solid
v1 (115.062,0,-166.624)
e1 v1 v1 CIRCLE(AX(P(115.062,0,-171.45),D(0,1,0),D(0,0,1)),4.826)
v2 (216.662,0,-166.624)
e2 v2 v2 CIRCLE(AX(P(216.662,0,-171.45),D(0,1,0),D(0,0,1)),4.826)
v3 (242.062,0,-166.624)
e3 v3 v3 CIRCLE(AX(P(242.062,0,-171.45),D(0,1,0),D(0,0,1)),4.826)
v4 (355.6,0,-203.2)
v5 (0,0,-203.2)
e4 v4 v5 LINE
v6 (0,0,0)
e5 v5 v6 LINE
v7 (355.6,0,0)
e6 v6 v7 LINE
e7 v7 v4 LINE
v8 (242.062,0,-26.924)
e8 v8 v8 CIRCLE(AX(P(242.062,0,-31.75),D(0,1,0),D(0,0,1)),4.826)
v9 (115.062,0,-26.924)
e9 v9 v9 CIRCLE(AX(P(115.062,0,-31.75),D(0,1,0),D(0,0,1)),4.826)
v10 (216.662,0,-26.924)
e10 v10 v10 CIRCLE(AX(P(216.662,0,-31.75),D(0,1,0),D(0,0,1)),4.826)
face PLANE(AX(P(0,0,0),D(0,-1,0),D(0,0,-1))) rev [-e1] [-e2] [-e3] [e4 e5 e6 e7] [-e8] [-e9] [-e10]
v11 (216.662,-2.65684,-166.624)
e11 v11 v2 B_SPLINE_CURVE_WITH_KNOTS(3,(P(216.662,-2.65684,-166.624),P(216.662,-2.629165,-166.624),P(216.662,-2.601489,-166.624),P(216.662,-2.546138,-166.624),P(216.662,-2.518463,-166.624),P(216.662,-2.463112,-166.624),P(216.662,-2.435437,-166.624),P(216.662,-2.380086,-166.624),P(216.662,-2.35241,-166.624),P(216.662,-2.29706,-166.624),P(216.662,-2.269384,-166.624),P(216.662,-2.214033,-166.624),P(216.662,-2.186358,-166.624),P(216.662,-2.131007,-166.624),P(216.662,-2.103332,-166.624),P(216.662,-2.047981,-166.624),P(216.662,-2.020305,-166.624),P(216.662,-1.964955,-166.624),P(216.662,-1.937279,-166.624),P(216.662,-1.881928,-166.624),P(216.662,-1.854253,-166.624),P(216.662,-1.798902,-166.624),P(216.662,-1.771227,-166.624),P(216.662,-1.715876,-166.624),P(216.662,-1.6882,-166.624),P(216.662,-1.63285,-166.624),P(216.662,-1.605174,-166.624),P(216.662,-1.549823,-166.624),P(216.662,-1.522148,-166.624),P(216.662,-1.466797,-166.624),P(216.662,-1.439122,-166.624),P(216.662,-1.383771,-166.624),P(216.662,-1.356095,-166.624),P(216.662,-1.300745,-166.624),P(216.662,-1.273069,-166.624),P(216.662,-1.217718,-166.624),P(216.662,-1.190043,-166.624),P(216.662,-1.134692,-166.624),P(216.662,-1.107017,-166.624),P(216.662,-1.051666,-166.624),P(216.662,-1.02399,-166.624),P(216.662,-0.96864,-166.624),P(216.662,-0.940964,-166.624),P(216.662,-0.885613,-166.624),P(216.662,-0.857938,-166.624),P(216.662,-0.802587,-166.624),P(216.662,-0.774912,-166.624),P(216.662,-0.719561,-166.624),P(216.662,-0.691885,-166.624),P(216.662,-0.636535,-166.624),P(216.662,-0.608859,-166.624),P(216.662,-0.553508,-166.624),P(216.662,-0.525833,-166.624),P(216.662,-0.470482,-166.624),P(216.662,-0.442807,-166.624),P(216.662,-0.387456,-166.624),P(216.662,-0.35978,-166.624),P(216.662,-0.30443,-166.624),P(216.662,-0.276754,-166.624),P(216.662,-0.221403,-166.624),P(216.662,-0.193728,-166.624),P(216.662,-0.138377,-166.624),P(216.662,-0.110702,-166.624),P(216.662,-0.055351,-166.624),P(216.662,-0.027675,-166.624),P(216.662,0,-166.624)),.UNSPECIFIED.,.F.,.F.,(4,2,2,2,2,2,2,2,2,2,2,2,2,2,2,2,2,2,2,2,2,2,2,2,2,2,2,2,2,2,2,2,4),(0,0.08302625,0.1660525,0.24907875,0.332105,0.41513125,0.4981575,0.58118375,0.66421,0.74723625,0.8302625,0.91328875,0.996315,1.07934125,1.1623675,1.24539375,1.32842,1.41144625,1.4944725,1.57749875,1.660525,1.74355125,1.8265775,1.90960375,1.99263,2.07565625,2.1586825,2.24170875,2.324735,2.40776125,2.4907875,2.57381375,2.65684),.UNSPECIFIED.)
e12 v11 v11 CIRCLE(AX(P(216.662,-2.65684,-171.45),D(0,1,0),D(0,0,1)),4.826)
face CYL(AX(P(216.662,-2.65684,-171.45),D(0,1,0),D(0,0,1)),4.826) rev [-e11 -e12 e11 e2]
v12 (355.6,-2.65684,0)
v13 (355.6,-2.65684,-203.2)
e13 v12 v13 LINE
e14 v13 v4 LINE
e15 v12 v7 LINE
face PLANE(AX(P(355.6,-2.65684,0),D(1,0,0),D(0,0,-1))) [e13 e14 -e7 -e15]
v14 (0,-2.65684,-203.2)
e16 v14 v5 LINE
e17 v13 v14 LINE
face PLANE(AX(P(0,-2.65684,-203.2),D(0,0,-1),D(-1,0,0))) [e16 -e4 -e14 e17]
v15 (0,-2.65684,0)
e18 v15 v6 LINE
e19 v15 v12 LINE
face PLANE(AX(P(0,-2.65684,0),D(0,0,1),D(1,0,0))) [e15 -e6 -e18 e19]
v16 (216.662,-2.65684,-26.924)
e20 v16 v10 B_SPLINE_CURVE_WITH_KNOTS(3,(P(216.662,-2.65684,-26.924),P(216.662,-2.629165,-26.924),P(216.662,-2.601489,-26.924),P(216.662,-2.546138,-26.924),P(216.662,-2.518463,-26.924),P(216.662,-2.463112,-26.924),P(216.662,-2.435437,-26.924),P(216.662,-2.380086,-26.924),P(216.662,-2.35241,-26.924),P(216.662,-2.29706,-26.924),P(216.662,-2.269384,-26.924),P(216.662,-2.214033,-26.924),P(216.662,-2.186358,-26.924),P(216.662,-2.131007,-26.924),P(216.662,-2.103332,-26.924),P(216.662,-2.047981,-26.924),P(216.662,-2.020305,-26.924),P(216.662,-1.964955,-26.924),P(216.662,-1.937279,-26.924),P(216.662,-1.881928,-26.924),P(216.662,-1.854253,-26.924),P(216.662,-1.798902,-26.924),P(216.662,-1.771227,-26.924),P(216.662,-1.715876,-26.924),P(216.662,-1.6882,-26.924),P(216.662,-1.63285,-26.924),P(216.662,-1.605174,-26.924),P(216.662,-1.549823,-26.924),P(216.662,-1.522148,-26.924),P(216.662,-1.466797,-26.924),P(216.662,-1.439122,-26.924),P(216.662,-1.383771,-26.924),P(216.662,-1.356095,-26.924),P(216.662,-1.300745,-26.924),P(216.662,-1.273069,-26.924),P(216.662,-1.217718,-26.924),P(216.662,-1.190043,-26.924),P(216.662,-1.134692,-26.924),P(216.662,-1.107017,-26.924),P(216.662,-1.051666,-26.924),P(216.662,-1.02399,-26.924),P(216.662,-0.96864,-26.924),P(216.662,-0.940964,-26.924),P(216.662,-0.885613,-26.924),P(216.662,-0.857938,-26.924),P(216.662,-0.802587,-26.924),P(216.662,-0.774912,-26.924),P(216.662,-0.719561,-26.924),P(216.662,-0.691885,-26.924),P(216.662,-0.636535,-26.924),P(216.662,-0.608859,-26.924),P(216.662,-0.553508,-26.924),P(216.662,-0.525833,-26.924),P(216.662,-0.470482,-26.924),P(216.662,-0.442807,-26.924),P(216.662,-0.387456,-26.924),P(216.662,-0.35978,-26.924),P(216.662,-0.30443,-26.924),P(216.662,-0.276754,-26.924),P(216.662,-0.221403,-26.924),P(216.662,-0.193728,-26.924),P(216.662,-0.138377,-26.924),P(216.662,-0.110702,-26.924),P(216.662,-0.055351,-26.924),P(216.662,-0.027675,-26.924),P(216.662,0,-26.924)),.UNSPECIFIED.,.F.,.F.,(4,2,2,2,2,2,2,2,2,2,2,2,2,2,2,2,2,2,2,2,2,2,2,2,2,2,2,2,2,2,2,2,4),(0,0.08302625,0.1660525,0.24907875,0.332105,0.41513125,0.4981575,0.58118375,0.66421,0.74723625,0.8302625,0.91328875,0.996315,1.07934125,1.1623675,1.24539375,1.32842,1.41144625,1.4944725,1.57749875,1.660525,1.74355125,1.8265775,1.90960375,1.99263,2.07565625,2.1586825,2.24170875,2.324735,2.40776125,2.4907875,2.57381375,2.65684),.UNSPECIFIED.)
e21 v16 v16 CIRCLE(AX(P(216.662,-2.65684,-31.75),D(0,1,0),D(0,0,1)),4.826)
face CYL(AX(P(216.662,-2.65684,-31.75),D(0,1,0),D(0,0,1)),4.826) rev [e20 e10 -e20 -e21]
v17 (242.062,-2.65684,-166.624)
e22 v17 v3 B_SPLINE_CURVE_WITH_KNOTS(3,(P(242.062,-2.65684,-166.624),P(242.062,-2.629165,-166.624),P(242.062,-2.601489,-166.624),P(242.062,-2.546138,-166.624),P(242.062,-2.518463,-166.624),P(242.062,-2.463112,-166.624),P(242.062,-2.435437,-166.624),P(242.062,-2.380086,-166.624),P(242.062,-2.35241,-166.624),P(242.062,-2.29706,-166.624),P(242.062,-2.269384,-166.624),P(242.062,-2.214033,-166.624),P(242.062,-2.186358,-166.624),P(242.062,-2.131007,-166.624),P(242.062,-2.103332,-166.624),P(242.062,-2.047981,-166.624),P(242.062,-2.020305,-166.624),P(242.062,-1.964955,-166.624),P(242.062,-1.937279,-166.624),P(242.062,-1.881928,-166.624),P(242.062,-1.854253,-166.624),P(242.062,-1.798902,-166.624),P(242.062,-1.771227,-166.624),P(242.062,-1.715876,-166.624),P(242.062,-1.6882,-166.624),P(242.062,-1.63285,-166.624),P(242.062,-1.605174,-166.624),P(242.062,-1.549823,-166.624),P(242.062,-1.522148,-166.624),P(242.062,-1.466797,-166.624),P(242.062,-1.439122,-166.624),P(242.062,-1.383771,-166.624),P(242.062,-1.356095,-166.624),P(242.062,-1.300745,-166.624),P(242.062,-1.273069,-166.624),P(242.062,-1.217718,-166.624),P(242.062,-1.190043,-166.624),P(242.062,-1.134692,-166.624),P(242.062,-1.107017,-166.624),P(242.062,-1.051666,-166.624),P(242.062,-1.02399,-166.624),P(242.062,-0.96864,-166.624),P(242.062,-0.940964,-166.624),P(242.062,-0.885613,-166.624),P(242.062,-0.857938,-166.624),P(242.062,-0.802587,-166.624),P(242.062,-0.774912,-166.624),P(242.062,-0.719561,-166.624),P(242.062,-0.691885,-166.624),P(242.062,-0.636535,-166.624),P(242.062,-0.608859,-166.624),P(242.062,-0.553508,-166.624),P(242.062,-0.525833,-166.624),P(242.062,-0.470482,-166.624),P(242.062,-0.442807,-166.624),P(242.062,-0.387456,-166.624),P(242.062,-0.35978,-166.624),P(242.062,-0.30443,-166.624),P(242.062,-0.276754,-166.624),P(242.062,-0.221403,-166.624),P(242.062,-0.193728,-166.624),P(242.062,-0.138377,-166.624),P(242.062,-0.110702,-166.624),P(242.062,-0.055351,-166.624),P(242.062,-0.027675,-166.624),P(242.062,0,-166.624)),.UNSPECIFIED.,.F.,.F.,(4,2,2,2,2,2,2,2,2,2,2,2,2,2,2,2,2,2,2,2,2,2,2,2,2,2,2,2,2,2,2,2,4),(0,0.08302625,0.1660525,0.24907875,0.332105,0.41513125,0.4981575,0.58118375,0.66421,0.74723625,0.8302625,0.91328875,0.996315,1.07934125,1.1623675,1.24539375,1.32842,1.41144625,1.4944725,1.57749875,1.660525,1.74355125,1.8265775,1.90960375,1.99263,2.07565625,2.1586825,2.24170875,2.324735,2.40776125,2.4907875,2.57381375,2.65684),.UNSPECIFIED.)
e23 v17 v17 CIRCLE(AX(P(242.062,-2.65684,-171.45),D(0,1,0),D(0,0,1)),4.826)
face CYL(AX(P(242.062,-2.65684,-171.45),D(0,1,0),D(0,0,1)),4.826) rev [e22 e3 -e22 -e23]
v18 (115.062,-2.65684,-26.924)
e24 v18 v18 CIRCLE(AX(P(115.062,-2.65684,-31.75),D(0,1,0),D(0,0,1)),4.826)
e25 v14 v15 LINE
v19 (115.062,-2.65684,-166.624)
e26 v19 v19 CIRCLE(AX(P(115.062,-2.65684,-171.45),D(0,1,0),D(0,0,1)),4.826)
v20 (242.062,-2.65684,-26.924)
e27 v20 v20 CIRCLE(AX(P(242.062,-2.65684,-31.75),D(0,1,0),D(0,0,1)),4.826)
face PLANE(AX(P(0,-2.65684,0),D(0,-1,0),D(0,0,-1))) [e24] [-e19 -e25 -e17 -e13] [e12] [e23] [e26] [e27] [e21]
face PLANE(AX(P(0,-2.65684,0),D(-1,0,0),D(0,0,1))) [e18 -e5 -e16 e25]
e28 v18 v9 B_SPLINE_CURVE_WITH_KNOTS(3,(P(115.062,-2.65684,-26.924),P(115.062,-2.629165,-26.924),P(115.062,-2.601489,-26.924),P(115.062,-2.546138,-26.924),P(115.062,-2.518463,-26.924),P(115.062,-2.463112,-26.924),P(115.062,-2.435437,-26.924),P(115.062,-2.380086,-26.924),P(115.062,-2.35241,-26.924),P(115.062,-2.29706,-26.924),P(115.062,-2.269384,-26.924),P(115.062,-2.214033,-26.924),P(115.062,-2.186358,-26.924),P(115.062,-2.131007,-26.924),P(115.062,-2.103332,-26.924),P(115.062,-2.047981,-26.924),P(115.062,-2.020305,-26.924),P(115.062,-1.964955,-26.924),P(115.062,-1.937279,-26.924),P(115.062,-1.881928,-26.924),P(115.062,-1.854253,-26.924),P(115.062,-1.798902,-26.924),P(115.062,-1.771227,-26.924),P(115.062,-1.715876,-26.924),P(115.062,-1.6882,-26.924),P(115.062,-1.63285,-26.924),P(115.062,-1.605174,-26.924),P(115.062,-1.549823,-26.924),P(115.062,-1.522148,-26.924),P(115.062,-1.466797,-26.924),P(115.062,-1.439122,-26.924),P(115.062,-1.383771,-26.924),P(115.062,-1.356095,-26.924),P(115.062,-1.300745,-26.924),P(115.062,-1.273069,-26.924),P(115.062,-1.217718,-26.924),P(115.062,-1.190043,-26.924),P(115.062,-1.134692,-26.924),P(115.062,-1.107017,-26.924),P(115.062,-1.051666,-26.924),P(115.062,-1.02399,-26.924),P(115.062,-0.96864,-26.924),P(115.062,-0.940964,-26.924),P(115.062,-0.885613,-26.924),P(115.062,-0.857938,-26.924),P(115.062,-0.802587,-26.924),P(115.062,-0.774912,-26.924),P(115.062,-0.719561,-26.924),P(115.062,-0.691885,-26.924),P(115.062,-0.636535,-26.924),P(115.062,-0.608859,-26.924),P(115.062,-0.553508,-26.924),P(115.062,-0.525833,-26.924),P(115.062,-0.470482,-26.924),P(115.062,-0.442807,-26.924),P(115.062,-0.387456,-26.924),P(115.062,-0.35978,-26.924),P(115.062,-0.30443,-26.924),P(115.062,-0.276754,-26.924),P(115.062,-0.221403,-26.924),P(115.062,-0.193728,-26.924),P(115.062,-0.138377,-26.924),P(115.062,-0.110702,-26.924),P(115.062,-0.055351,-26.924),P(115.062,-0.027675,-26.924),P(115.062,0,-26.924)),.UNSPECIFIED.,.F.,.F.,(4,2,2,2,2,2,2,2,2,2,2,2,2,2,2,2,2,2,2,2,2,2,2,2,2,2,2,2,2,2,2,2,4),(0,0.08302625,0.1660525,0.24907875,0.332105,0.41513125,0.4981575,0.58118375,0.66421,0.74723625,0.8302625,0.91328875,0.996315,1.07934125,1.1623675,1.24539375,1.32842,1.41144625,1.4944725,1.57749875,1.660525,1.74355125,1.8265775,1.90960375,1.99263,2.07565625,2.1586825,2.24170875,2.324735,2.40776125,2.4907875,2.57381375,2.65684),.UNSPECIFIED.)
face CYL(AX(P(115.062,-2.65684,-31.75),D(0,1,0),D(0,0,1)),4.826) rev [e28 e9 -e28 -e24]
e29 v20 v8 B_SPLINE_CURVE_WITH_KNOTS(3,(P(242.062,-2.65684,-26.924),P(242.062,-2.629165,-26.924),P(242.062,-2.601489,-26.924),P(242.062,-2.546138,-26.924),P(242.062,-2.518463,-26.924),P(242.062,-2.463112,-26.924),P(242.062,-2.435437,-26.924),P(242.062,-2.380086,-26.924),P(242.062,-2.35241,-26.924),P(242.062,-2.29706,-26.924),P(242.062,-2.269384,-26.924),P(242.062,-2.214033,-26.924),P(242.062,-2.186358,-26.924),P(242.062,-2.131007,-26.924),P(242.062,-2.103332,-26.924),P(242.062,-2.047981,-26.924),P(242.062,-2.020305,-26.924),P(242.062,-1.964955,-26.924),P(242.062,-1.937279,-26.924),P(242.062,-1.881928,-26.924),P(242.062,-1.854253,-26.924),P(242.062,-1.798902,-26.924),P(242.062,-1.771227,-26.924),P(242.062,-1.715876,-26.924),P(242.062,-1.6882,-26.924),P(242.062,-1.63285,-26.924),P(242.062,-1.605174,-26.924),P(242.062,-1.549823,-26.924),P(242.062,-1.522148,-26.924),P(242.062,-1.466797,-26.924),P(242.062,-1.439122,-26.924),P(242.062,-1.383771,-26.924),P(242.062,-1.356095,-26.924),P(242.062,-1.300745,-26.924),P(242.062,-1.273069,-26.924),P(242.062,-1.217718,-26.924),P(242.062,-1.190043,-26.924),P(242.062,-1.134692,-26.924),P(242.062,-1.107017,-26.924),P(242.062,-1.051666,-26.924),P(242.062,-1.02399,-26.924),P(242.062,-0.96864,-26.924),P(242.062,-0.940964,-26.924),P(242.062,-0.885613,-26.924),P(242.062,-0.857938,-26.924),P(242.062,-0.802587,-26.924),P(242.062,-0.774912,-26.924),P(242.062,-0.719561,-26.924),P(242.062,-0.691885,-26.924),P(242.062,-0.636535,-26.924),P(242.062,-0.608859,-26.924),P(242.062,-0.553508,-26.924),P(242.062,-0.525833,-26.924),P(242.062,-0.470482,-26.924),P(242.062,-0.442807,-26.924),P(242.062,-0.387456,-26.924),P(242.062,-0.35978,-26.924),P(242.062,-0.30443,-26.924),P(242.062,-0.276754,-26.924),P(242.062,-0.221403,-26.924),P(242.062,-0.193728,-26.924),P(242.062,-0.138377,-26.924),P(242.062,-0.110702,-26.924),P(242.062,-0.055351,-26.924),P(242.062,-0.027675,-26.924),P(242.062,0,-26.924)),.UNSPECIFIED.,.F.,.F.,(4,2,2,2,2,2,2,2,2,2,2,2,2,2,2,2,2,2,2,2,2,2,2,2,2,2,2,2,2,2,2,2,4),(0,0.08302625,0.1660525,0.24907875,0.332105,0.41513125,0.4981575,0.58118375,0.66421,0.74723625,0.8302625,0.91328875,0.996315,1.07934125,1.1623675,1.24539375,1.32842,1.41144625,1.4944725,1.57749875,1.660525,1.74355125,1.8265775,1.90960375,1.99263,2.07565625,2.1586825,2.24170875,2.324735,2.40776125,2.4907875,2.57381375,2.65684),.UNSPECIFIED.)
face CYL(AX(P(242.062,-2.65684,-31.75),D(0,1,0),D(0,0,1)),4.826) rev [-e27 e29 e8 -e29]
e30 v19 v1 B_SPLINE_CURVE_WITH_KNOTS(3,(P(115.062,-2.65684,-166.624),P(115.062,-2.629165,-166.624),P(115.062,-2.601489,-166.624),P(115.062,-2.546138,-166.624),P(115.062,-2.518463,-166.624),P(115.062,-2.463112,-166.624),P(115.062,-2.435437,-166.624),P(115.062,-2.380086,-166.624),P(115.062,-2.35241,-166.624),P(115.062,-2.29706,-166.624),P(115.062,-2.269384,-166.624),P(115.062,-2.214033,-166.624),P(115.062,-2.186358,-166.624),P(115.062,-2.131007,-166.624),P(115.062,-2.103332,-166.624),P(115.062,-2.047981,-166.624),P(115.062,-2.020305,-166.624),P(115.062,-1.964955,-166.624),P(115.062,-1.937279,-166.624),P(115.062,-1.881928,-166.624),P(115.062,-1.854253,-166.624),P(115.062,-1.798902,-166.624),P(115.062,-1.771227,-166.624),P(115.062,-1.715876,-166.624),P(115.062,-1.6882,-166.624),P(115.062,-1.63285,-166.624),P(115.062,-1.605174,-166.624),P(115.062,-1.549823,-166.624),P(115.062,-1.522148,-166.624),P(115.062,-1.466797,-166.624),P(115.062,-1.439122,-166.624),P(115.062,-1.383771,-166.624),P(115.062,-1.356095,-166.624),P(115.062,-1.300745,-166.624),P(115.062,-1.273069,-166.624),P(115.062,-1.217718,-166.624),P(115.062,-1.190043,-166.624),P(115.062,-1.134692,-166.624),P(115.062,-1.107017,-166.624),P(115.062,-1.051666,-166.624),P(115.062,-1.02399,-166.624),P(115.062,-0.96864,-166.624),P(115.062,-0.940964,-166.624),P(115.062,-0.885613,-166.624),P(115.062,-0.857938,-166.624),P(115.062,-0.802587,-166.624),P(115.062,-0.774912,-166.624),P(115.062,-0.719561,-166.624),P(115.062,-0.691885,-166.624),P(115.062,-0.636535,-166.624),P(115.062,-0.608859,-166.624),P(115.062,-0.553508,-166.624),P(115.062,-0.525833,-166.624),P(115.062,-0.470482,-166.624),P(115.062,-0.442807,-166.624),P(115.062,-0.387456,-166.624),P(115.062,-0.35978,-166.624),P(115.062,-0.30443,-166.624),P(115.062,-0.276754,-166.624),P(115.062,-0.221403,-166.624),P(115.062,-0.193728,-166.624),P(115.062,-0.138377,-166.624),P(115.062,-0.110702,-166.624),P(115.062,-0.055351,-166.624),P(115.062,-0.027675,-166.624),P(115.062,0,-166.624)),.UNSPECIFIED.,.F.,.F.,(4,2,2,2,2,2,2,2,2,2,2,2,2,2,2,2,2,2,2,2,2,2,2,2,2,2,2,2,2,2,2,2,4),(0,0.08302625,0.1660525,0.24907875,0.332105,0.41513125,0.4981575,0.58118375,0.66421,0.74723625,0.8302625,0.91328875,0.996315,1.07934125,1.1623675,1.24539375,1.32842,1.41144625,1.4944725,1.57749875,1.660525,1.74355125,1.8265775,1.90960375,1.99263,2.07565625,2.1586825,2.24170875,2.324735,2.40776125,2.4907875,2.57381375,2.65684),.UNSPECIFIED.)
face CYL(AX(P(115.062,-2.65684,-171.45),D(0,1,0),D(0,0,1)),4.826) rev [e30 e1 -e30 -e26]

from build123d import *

# Parameters (mm, degrees)
SKETCH1_W          = 355.6
SKETCH1_H          = 203.2
BASE_FLANGE1_DEPTH = 2.65684
SKETCH8_R          = 4.826
CUT_EXTRUDE1_DEPTH = 410.571311006


# Sheet-metal steps are written as plain solids
with BuildPart() as part:
    # Sketch1 → Base-Flange1 (new body)
    with BuildSketch(Plane(origin=(0, 0, 0), x_dir=(1, 0, 0), z_dir=(0, 1, 0))):
        with Locations((177.8, 101.6)):
            Rectangle(SKETCH1_W, SKETCH1_H)
    extrude(amount=-BASE_FLANGE1_DEPTH)

    # Sketch8 → Cut-Extrude1 (cut, through all)
    with BuildSketch(Plane(origin=(0, 0, 0), x_dir=(1, 0, 0), z_dir=(0, 1, 0))):
        with Locations(Location((115.062, 171.45, 0), (0, 0, 270))):
            Circle(SKETCH8_R)
        with Locations(Location((216.662, 171.45, 0), (0, 0, 270))):
            Circle(SKETCH8_R)
        with Locations(Location((242.062, 171.45, 0), (0, 0, 270))):
            Circle(SKETCH8_R)
        with Locations(Location((242.062, 31.75, 0), (0, 0, 270))):
            Circle(SKETCH8_R)
        with Locations(Location((216.662, 31.75, 0), (0, 0, 270))):
            Circle(SKETCH8_R)
        with Locations(Location((115.062, 31.75, 0), (0, 0, 270))):
            Circle(SKETCH8_R)
    extrude(amount=-CUT_EXTRUDE1_DEPTH, mode=Mode.SUBTRACT)


solid = part.part
